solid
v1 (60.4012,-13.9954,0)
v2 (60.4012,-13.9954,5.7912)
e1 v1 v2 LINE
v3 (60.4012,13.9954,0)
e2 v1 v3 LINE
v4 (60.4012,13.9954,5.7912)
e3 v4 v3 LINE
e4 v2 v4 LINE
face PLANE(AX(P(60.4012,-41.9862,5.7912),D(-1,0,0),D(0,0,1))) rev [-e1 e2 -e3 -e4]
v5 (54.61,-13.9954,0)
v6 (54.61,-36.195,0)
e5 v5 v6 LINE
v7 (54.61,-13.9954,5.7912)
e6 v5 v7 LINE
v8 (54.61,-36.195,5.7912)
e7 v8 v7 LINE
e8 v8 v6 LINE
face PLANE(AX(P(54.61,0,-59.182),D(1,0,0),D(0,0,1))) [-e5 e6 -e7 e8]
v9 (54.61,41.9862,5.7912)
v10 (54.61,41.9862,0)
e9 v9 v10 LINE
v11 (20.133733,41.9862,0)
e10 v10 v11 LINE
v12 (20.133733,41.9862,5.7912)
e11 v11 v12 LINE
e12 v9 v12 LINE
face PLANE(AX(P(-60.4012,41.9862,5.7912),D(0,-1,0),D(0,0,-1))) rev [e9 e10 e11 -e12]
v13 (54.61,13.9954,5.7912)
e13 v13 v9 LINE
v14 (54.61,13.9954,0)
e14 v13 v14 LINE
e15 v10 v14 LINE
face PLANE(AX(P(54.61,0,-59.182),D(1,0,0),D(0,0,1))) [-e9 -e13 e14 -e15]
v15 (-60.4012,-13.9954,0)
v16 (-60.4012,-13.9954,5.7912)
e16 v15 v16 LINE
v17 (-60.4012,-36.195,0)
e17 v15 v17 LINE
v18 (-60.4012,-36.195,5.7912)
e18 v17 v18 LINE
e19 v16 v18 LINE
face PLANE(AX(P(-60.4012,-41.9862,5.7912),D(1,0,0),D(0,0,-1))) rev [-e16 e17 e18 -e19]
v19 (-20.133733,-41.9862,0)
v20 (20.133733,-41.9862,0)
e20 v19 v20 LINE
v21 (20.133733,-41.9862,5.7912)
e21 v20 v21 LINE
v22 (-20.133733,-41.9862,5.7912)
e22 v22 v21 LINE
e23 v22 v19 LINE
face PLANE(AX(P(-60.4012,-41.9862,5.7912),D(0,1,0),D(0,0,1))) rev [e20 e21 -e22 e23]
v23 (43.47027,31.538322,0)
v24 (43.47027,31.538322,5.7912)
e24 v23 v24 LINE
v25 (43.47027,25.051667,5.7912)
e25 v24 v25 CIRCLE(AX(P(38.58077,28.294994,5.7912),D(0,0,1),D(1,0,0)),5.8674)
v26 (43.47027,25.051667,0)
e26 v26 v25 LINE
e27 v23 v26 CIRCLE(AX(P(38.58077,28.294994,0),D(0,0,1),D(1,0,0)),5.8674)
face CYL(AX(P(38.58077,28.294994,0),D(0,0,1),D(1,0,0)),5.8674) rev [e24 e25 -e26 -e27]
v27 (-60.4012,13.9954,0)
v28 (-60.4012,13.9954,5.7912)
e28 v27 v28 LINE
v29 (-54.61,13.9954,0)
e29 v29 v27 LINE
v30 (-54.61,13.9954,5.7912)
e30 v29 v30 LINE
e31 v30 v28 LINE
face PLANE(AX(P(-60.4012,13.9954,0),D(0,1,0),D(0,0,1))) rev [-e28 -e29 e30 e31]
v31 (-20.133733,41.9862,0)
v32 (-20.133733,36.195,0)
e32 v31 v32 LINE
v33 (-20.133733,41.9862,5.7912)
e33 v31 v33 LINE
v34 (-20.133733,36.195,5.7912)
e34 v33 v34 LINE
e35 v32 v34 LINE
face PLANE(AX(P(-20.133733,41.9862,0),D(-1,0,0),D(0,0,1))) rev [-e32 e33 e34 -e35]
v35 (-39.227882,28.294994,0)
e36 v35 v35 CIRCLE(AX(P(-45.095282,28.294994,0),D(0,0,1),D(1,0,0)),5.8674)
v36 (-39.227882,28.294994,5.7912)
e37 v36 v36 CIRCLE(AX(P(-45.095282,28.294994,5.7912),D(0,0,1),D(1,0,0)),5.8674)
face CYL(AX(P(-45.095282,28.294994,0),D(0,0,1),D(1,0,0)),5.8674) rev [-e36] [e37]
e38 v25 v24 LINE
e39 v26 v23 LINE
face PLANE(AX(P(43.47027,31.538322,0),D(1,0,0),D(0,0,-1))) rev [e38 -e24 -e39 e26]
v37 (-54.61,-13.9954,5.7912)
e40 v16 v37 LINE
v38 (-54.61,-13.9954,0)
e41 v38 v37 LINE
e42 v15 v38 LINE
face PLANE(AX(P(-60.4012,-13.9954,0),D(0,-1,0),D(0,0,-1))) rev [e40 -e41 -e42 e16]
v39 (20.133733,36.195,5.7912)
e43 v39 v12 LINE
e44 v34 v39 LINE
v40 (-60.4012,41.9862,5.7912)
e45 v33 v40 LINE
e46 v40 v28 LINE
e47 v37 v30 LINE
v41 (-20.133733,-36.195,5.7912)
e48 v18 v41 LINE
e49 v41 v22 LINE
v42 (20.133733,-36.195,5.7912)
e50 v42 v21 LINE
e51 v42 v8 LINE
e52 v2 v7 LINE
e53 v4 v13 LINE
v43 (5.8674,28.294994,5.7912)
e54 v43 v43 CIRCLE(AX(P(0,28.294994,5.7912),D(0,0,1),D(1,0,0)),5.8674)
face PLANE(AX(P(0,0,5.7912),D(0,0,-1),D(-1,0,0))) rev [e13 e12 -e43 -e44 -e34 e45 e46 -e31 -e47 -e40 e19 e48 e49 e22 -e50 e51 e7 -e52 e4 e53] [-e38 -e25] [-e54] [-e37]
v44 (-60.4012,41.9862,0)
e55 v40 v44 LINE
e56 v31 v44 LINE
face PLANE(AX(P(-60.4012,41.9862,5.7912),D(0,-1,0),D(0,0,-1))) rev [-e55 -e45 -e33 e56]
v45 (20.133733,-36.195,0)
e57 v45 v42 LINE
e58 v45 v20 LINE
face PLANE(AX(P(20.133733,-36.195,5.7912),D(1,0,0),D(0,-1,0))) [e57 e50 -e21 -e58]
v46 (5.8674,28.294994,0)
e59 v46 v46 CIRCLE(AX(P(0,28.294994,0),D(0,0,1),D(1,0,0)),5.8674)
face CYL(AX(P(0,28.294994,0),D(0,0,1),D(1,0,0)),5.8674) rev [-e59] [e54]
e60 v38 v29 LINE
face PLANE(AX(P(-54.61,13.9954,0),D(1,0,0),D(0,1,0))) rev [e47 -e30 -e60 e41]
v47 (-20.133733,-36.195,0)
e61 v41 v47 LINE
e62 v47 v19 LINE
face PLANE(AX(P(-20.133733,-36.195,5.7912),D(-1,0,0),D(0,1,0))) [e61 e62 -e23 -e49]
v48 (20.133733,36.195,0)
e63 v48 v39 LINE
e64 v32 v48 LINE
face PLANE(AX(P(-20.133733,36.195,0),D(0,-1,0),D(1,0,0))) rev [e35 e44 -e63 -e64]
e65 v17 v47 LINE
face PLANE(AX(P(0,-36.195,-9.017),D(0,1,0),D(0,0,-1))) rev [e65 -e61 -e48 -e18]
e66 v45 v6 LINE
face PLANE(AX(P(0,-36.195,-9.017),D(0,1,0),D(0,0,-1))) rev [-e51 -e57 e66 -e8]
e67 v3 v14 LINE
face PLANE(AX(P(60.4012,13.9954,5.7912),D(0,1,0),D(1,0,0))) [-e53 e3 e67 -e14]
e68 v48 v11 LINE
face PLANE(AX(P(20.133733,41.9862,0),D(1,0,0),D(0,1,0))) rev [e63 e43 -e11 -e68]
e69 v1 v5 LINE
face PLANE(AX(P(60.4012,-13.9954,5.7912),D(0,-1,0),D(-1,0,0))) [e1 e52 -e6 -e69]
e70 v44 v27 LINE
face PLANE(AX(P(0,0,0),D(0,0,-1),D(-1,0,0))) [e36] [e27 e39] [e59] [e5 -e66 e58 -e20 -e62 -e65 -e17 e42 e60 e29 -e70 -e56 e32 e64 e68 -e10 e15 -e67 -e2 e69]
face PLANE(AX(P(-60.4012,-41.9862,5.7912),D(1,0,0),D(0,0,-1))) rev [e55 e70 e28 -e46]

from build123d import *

# Parameters (mm, degrees)
SKETCH1_W           = 120.8024
SKETCH1_H           = 83.9724
BOSS_EXTRUDE1_DEPTH = 5.7912
SKETCH2_W           = 40.267466666
SKETCH2_H           = 5.7912
CUT_EXTRUDE1_DEPTH  = 74.788101679
SKETCH9_W           = 5.7912
SKETCH9_H           = 27.9908
CUT_EXTRUDE8_DEPTH  = 74.788101679
CAVITY1_START       = -41.9862
CAVITY1_OUTLINE_W   = 40.267466667
CAVITY1_OUTLINE_H   = 5.7912
CAVITY1_DEPTH       = 5.7912
CAVITY1_START_2     = 13.9954
CAVITY1_2_OUTLINE_W = 5.7912
CAVITY1_2_OUTLINE_H = 5.7912
CAVITY1_2_DEPTH     = 27.9908
CAVITY1_START_3     = -36.195
CAVITY1_3_OUTLINE_W = 5.7912
CAVITY1_3_OUTLINE_H = 5.7912
CAVITY1_3_DEPTH     = 22.1996
SKETCH12_R          = 5.8674
SKETCH12_W          = 10.922
SKETCH12_H          = 12.7
CUT_EXTRUDE11_DEPTH = 74.788101679


# Read off the part's stored shape, not the designer's step: Cavity1
with BuildPart() as part:
    # Sketch1 → Boss-Extrude1 (new body)
    with BuildSketch(Plane.XY):
        Rectangle(SKETCH1_W, SKETCH1_H)
    extrude(amount=BOSS_EXTRUDE1_DEPTH)

    # Sketch2 → Cut-Extrude1 (cut, through all)
    with BuildSketch(Plane.XY.offset(5.7912)):
        with Locations((0, 39.0906)):
            Rectangle(SKETCH2_W, SKETCH2_H)
    extrude(amount=-CUT_EXTRUDE1_DEPTH, mode=Mode.SUBTRACT)

    # Sketch9 → Cut-Extrude8 (cut, through all)
    with BuildSketch(Plane.XY.offset(5.7912)):
        with Locations((-57.5056, 0)):
            Rectangle(SKETCH9_W, SKETCH9_H)
    extrude(amount=-CUT_EXTRUDE8_DEPTH, mode=Mode.SUBTRACT)

    # Cavity1 outline → Cavity1 (cut)
    with BuildSketch(Plane(origin=(0, 0, 0), x_dir=(1, 0, 0), z_dir=(0, 1, 0)).offset(CAVITY1_START)):
        with Locations((40.267466666, -2.8956)):
            Rectangle(CAVITY1_OUTLINE_W, CAVITY1_OUTLINE_H)
        with Locations((-40.267466666, -2.8956)):
            Rectangle(CAVITY1_OUTLINE_W, CAVITY1_OUTLINE_H)
    extrude(amount=CAVITY1_DEPTH, mode=Mode.SUBTRACT)

    # Cavity1 2 outline → Cavity1 2 (cut)
    with BuildSketch(Plane(origin=(0, 0, 0), x_dir=(1, 0, 0), z_dir=(0, 1, 0)).offset(CAVITY1_START_2)):
        with Locations((57.5056, -2.8956)):
            Rectangle(CAVITY1_2_OUTLINE_W, CAVITY1_2_OUTLINE_H)
    extrude(amount=CAVITY1_2_DEPTH, mode=Mode.SUBTRACT)

    # Cavity1 3 outline → Cavity1 3 (cut)
    with BuildSketch(Plane(origin=(0, 0, 0), x_dir=(1, 0, 0), z_dir=(0, 1, 0)).offset(CAVITY1_START_3)):
        with Locations((57.5056, -2.8956)):
            Rectangle(CAVITY1_3_OUTLINE_W, CAVITY1_3_OUTLINE_H)
    extrude(amount=CAVITY1_3_DEPTH, mode=Mode.SUBTRACT)

    # Sketch12 → Cut-Extrude11 (cut, through all)
    with BuildSketch(Plane.XY.offset(5.7912)):
        with Locations((-45.095282218, 28.294994395)):
            Circle(SKETCH12_R)
        with Locations((0, 28.294994395)):
            Circle(SKETCH12_R)
        with Locations((-777.151378692, 665.228044766)):
            Rectangle(SKETCH12_W, SKETCH12_H)
        with BuildLine():
            Line((43.470269973, 31.538321778), (43.470269973, 25.051667013))
            ThreePointArc((43.470269973, 25.051667013), (32.713369973, 28.294994395), (43.470269973, 31.538321778))
        make_face()
    extrude(amount=-CUT_EXTRUDE11_DEPTH, mode=Mode.SUBTRACT)


solid = part.part
